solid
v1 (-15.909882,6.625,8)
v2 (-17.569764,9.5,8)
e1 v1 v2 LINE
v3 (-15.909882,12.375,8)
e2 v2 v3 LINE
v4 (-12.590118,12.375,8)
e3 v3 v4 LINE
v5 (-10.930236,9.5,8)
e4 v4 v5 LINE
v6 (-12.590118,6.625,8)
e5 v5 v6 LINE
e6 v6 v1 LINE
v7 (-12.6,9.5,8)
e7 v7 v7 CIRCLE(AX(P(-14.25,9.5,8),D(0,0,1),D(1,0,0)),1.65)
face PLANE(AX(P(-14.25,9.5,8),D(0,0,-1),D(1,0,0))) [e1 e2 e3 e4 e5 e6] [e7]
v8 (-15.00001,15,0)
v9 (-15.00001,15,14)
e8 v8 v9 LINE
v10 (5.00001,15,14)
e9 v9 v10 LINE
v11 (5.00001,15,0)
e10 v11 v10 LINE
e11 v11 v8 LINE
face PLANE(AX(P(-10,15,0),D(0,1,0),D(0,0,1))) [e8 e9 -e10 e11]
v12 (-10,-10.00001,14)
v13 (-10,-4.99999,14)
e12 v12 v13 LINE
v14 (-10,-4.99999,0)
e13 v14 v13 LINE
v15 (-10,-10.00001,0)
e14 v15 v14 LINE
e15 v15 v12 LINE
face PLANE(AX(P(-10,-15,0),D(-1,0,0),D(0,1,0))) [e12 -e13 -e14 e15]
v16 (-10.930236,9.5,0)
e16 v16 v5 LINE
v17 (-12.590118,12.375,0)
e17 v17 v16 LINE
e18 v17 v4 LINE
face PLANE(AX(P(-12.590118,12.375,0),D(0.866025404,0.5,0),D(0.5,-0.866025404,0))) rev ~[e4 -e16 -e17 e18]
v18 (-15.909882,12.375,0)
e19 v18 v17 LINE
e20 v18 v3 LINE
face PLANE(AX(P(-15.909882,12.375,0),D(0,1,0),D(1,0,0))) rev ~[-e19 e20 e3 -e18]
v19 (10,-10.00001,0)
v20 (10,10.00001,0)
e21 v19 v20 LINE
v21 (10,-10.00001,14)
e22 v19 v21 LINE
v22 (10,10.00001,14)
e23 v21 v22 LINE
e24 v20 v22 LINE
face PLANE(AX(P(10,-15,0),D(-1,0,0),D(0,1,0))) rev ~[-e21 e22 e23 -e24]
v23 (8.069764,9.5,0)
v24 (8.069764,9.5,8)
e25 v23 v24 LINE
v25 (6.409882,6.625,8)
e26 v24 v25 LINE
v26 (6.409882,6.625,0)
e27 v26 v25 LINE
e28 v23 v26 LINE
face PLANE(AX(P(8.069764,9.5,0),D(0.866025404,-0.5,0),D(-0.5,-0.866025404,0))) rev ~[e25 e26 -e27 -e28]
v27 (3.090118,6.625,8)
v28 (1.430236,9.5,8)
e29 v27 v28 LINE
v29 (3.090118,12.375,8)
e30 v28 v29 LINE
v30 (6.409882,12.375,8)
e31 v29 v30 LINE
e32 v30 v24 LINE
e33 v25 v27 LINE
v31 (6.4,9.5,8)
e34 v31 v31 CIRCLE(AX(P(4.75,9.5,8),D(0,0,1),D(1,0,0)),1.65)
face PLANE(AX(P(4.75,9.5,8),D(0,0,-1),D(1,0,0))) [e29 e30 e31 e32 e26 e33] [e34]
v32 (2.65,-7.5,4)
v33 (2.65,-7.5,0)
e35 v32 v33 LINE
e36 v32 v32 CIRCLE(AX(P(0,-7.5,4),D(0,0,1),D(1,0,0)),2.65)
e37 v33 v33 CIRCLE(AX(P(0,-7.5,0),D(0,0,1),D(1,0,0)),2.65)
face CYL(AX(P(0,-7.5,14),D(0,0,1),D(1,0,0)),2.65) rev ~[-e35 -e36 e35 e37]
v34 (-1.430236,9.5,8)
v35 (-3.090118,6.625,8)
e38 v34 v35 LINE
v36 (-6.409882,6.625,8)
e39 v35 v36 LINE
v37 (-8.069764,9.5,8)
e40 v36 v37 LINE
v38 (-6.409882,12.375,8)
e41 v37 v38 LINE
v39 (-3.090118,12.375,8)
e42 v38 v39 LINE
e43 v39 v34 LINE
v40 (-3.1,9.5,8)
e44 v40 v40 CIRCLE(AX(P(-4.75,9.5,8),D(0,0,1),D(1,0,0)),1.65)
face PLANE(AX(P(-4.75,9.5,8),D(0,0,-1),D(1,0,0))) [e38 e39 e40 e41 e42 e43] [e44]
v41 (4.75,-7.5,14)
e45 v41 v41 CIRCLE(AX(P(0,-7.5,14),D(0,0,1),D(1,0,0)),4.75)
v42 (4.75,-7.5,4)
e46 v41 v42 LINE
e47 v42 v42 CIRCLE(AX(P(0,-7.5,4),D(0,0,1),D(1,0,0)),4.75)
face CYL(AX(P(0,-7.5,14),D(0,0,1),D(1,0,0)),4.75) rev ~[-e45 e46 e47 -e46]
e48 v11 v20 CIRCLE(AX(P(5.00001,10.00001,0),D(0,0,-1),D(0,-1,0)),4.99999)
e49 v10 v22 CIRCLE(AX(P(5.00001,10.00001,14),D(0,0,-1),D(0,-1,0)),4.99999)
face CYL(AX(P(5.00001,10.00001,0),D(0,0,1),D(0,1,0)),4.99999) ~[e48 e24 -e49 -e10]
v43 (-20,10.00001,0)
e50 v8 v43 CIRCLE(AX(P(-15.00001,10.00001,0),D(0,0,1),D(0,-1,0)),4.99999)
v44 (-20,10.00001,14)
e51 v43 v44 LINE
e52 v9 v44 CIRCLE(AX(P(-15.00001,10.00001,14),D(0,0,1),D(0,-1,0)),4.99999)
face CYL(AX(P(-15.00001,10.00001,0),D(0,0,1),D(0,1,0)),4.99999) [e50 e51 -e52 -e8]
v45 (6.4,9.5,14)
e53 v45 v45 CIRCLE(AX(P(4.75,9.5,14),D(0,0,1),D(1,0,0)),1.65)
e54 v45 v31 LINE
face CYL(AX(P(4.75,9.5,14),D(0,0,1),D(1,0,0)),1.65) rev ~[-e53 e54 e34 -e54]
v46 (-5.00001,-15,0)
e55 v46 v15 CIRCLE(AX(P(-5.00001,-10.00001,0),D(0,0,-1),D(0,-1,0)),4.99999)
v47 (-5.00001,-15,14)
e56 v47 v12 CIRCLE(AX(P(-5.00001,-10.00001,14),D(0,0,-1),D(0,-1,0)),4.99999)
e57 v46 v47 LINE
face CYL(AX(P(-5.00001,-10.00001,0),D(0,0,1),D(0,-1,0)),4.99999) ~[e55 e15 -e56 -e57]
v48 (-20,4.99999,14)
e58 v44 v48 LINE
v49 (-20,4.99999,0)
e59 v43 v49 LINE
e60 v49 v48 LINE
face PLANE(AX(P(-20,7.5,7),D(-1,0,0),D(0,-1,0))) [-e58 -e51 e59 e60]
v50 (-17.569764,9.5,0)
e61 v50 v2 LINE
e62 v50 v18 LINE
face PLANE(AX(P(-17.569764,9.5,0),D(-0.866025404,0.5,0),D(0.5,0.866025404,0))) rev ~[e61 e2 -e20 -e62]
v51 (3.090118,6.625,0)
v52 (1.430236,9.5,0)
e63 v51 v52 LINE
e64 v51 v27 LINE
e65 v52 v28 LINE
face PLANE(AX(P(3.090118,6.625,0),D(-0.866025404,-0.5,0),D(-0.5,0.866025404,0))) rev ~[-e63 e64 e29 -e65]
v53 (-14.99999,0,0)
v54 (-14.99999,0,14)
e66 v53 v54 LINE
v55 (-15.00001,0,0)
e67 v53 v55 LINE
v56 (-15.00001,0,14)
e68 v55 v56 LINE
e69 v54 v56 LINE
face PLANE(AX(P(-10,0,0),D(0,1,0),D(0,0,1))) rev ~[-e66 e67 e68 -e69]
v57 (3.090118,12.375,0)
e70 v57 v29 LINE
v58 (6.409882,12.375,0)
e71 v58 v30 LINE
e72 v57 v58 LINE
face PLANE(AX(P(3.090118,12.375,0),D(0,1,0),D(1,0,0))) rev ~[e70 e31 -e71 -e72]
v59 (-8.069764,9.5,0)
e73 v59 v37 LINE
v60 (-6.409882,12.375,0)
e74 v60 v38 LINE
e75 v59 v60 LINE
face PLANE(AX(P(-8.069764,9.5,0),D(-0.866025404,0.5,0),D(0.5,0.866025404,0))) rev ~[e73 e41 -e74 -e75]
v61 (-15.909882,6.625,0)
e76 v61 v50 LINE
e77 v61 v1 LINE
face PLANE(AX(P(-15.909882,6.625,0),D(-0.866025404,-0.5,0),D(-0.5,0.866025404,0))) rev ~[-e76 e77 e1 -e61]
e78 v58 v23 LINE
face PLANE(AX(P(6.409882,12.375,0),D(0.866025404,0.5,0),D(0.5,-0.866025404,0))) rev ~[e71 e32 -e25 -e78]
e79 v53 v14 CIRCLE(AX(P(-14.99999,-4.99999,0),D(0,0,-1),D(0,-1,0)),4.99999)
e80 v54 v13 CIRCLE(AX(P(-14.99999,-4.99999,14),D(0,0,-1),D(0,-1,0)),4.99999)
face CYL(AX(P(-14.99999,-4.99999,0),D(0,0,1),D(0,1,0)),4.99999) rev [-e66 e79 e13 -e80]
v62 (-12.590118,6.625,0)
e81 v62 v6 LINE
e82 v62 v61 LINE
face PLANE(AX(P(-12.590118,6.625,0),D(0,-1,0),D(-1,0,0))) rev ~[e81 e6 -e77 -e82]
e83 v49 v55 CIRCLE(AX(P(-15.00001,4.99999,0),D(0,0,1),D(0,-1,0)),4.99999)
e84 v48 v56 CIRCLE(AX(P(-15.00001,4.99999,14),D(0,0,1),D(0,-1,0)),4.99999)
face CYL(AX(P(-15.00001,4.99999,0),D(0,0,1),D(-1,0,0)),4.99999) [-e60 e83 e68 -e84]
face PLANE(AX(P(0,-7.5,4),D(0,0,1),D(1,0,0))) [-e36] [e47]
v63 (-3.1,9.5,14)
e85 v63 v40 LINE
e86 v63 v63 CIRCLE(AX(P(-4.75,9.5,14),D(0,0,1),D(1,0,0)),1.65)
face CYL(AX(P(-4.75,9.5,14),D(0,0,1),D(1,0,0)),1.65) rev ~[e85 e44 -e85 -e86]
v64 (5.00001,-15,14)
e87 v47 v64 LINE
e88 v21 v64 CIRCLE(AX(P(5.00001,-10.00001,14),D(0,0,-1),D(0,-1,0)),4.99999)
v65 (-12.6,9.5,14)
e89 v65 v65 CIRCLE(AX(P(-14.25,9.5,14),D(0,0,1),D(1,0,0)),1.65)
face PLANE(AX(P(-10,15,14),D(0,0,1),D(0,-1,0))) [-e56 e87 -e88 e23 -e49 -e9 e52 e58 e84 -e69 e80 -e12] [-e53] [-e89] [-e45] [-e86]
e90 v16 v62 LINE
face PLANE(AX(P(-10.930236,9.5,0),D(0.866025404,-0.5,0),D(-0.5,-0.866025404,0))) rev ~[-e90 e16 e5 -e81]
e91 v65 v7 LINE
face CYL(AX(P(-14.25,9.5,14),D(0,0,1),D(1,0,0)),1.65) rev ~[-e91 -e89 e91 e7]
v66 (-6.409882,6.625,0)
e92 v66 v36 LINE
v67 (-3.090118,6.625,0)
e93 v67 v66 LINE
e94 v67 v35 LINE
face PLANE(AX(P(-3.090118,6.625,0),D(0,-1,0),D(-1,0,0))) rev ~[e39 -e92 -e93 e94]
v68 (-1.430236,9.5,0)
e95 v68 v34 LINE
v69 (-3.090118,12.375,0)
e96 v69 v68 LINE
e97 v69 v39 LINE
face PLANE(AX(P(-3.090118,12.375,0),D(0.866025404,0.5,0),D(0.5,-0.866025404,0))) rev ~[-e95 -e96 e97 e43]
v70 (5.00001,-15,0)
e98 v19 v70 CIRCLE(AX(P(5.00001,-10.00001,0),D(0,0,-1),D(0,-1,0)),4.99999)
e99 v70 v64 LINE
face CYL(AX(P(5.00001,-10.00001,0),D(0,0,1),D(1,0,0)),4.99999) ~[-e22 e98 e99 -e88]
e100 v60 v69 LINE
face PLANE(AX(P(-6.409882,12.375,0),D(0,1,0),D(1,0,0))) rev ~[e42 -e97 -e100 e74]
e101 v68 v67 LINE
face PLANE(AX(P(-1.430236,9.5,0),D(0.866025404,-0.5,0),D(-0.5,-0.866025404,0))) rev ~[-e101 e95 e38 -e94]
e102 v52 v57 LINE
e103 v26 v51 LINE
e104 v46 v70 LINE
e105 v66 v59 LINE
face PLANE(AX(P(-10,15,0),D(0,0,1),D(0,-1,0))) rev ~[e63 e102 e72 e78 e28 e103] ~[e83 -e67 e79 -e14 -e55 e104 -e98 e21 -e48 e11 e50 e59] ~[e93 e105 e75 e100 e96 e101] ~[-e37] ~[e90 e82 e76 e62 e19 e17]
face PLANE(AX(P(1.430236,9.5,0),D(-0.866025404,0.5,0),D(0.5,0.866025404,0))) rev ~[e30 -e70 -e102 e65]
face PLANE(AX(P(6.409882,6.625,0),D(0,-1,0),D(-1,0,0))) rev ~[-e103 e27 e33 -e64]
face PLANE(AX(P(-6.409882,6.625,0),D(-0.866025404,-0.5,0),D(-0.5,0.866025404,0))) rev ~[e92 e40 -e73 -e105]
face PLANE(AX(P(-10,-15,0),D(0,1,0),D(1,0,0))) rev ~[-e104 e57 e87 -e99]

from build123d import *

# Parameters (mm, degrees)
F0_W      = 20
F0_H      = 30
F1_DEPTH  = 14
F2_R      = 2.65
F3_DEPTH  = 14.001
F4_R      = 1.65
F5_DEPTH  = 14.001
F6_W      = 15
F6_H      = 14
F7_DEPTH  = 10
F8_R      = 1.65
F9_DEPTH  = 14.001
F10_R     = 4.99999
F12_DEPTH = 8
F13_R     = 4.75
F14_DEPTH = 10


# Not quite as in the source:
# - a fillet or chamfer is up to 0.001 mm smaller than in the source, because OpenCascade refuses the exact size


with BuildPart() as f1:
    # F0 (on Top) → F1 (new body)
    with BuildSketch(Plane.XY):
        Rectangle(F0_W, F0_H)
    extrude(amount=F1_DEPTH)

    # F2 (on face) → F3 (cut, through all)
    with BuildSketch(Plane.XY.offset(14)):
        with Locations((0, -7.5)):
            Circle(F2_R)
    extrude(amount=-F3_DEPTH, mode=Mode.SUBTRACT)

    # F4 (on face) → F5 (cut, through all)
    with BuildSketch(Plane.XY.offset(14)):
        with Locations((-4.75, 9.5)):
            Circle(F4_R)
        with Locations((4.75, 9.5)):
            Circle(F4_R)
    extrude(amount=-F5_DEPTH, mode=Mode.SUBTRACT)

    # F6 (on face) → F7 (join)
    with BuildSketch(Plane(origin=(-10, 0, 0), x_dir=(0, -1, 0), z_dir=(-1, 0, 0))):
        with Locations((-7.5, 7)):
            Rectangle(F6_W, F6_H)
    extrude(amount=F7_DEPTH)

    # F8 (on face) → F9 (cut, through all)
    with BuildSketch(Plane.XY.offset(14)):
        with Locations((-14.25, 9.5)):
            Circle(F8_R)
    extrude(amount=-F9_DEPTH, mode=Mode.SUBTRACT)

    # F10 (radius 5 in the source; OpenCascade refuses exactly that, so slightly less here)
    f10_edges = [f1.edges().sort_by_distance(p)[0] for p in [
        (-12.6, 9.5, 7),
        (-10, -15, 7),
        (10, -15, 7),
        (-10, 0, 7),
        (-20, 0, 7),
        (-20, 15, 7),
        (10, 15, 7),
    ]]
    fillet(f10_edges, radius=F10_R)

    # F11 (on face) → F12 (cut)
    with BuildSketch(Plane(origin=(0, 0, 0), x_dir=(1, 0, 0), z_dir=(0, 0, -1))):
        Polygon((-17.5697640478, -9.5), (-15.9098820239, -12.375), (-12.5901179761, -12.375), (-10.9302359522, -9.5), (-12.5901179761, -6.625), (-15.9098820239, -6.625), align=None)
        Polygon((3.0901179761, -6.625), (1.4302359522, -9.5), (3.0901179761, -12.375), (6.4098820239, -12.375), (8.0697640478, -9.5), (6.4098820239, -6.625), align=None)
        Polygon((-6.4098820239, -6.625), (-8.0697640478, -9.5), (-6.4098820239, -12.375), (-3.0901179761, -12.375), (-1.4302359522, -9.5), (-3.0901179761, -6.625), align=None)
    extrude(amount=-F12_DEPTH, mode=Mode.SUBTRACT)

    # F13 (on face) → F14 (cut)
    with BuildSketch(Plane.XY.offset(14)):
        with Locations((0, -7.5)):
            Circle(F13_R)
    extrude(amount=-F14_DEPTH, mode=Mode.SUBTRACT)


solid = f1.part
